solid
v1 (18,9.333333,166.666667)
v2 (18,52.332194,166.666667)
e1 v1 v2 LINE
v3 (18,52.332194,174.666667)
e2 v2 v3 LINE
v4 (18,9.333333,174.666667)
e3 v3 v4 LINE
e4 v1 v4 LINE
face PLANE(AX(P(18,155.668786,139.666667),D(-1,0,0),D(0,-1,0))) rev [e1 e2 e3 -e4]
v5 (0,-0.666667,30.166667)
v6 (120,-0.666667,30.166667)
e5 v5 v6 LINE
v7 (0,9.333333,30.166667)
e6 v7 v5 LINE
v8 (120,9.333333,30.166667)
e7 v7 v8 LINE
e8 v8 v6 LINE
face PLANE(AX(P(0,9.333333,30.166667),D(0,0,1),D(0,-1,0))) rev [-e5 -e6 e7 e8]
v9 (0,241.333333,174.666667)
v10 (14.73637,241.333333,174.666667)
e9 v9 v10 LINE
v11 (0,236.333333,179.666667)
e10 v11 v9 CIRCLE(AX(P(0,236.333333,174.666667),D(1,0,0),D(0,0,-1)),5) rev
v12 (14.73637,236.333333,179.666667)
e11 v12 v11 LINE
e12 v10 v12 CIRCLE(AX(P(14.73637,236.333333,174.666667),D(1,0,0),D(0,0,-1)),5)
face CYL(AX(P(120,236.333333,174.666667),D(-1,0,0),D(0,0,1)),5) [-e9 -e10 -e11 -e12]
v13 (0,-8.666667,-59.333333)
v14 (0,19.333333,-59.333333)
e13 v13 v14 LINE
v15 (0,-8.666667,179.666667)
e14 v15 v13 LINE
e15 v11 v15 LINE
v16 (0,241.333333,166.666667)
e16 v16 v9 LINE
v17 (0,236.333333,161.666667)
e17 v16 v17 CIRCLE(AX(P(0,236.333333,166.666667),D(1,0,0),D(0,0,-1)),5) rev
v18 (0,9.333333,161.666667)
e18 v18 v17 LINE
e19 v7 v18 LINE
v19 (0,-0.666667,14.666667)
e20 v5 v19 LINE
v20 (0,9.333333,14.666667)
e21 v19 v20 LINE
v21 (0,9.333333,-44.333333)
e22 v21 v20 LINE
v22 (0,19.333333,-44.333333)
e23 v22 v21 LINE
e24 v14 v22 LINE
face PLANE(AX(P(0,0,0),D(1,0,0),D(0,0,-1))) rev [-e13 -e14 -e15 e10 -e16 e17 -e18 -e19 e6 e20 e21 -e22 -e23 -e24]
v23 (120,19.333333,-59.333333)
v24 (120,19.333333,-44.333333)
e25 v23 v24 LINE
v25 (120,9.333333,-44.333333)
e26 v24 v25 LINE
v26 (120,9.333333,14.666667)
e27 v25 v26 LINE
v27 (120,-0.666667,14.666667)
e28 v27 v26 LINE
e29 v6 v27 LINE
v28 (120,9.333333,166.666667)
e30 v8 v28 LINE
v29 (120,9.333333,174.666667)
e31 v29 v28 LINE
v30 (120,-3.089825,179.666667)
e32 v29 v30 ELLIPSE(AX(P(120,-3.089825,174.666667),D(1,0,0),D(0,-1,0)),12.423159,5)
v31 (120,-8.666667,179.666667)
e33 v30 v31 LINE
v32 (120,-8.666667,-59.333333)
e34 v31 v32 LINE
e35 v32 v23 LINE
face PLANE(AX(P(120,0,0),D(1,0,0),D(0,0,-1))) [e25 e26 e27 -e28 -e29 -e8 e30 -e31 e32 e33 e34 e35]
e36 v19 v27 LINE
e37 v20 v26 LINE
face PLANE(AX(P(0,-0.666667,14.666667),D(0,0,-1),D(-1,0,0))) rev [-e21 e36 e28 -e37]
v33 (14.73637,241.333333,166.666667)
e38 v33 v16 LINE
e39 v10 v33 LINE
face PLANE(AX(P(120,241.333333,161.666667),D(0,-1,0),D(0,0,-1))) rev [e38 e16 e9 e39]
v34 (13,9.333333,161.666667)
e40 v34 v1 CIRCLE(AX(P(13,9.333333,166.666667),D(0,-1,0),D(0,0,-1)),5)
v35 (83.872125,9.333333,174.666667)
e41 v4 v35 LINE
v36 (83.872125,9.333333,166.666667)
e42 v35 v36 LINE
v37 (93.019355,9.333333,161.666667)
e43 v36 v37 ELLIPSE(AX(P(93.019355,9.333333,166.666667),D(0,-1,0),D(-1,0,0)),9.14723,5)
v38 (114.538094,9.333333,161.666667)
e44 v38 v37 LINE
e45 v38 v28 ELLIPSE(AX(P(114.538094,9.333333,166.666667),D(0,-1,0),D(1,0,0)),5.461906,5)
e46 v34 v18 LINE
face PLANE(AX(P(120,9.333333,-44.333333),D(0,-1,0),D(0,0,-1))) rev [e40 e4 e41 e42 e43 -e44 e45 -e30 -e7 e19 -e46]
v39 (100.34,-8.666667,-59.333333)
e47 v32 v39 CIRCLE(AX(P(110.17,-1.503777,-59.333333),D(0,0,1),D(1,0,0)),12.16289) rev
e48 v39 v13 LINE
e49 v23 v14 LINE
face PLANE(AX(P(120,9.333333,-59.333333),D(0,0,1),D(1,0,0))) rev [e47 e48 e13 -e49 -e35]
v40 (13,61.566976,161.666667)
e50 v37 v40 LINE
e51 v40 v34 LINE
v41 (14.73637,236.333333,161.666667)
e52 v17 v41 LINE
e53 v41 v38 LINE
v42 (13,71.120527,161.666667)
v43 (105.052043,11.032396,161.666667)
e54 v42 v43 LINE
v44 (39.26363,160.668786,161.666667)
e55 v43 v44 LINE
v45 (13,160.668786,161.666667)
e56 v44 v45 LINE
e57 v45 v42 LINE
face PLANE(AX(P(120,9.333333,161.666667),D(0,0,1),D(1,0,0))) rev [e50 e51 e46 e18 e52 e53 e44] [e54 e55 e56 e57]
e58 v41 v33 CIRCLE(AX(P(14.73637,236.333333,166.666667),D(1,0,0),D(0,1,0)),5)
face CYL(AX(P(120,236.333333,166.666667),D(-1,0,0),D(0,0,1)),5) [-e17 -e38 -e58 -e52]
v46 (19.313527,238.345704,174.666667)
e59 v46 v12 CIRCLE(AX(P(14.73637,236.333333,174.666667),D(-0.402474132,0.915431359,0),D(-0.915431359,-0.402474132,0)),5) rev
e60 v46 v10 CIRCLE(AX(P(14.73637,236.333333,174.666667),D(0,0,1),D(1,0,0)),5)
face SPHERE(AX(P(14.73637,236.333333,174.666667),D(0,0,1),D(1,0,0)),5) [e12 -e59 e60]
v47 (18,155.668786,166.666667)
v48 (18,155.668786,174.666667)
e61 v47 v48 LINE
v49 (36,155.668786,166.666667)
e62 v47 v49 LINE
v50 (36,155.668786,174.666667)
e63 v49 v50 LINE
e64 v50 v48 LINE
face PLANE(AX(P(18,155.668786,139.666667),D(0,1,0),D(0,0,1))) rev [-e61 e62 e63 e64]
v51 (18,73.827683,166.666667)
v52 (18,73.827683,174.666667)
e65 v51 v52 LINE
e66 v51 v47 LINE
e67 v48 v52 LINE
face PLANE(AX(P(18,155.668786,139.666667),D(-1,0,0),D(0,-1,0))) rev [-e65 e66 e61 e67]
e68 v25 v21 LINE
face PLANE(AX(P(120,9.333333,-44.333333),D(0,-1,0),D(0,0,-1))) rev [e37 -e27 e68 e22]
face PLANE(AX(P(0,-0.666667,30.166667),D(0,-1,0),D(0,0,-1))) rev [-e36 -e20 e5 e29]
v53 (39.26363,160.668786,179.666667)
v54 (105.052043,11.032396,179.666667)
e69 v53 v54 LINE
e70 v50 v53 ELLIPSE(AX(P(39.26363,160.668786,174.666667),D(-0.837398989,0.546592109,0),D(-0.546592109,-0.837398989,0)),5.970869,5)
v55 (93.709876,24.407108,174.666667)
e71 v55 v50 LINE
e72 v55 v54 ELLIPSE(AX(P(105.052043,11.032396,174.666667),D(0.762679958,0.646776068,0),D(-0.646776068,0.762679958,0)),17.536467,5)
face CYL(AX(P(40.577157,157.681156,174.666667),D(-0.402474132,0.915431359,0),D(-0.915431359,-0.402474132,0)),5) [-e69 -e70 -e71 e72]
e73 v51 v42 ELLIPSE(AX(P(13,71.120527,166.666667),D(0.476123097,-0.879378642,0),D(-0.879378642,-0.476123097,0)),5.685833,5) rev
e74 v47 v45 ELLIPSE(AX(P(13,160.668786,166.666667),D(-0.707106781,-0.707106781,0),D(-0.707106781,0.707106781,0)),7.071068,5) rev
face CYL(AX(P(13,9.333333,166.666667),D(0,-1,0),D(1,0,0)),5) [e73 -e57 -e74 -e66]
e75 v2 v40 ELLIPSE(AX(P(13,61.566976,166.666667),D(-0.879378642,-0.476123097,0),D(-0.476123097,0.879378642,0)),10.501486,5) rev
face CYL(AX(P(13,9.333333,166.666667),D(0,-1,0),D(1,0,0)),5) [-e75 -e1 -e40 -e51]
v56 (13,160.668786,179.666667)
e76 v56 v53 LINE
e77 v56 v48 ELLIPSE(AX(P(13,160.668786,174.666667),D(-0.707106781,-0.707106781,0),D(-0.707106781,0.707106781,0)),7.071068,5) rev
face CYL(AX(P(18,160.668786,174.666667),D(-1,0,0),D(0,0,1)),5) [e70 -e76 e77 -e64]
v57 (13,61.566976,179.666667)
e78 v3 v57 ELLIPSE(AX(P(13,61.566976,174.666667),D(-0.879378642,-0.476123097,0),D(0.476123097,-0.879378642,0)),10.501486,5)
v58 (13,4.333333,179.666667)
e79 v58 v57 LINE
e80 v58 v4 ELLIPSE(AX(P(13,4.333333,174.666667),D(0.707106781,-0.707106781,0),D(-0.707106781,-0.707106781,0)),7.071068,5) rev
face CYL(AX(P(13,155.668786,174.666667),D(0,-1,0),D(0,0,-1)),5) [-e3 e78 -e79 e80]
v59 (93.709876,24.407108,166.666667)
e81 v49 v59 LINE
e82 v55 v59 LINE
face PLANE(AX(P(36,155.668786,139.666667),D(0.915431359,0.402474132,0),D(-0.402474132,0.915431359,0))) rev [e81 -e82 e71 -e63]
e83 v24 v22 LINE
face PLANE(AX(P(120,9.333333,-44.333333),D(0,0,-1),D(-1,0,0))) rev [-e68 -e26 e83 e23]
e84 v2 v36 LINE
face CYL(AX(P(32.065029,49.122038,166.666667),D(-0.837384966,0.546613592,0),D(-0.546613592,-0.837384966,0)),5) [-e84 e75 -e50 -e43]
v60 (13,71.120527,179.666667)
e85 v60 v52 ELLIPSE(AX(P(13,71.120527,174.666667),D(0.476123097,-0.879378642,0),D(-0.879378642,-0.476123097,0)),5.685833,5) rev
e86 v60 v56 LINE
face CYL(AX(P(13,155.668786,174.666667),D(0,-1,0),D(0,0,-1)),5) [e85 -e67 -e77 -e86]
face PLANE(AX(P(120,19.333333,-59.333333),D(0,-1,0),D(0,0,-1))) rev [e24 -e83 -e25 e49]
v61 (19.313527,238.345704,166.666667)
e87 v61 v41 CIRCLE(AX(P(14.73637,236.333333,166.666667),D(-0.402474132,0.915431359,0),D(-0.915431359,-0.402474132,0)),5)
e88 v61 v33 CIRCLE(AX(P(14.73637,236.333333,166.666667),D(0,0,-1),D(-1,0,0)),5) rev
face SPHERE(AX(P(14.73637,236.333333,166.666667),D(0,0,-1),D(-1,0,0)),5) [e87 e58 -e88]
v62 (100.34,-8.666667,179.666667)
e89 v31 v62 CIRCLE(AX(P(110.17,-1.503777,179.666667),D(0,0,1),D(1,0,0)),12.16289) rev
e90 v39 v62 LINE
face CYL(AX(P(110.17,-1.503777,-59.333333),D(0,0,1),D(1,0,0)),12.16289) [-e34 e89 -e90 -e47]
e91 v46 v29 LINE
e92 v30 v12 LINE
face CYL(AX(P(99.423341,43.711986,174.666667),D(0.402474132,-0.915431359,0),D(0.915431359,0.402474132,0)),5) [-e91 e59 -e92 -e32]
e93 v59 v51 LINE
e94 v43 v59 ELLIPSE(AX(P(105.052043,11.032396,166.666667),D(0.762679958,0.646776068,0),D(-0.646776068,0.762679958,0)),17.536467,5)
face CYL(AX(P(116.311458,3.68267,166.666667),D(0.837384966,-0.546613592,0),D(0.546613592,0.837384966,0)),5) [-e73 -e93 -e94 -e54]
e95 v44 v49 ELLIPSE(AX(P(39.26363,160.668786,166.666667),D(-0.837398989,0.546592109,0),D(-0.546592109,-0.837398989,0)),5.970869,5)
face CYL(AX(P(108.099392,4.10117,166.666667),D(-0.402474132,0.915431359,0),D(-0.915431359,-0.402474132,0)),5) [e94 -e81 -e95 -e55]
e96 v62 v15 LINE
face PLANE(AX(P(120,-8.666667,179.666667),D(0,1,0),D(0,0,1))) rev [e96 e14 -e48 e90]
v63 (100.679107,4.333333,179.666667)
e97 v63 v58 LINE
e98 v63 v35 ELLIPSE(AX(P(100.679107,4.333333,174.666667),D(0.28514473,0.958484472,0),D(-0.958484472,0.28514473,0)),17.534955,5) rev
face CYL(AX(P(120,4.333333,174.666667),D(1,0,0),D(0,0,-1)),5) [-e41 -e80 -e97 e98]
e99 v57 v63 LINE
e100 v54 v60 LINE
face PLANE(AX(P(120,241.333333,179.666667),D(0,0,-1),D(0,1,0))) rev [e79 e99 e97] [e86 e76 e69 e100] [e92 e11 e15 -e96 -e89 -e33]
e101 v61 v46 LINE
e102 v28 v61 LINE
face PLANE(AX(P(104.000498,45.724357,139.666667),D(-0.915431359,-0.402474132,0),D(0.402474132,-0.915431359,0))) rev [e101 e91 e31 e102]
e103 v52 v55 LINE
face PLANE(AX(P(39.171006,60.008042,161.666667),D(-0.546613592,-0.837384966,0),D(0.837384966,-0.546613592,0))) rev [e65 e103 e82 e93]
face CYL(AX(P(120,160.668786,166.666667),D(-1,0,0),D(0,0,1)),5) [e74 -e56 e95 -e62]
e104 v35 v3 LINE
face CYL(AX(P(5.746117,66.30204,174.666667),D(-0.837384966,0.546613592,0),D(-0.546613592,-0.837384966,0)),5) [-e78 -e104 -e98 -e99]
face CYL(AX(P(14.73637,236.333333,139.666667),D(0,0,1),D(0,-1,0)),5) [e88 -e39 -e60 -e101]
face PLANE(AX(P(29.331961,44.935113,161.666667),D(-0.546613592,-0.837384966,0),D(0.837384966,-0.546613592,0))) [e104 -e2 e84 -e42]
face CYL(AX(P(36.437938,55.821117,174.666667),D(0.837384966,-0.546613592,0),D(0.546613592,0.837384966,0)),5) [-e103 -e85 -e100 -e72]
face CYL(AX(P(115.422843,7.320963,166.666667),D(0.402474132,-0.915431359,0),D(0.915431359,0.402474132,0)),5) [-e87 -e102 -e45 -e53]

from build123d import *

# Parameters (mm, degrees)
EXTRUDE_1_DEPTH     = 120
SKETCH_2_W          = 15.5
SKETCH_2_H          = 10
CUT_EXTRUDE_1_DEPTH = 324.916484435
CUT_EXTRUDE_2_DEPTH = 40
CUT_EXTRUDE_3_DEPTH = 40
FILLET_16_R         = 5
EXTRUDE_2_DEPTH     = 239
EXTRUDE_3_DEPTH     = 18
FILLET_17_R         = 5


with BuildPart() as part:
    # 草圖1 → 填料-伸長1 (new body)
    with BuildSketch(Plane(origin=(0, 0, 0), x_dir=(0, 0, -1), z_dir=(1, 0, 0))):
        Polygon((-179.666666667, 241.333333333), (-179.666666667, -8.666666667), (59.333333333, -8.666666667), (59.333333333, 9.333333333), (59.333333333, 19.333333333), (44.333333333, 19.333333333), (44.333333333, 9.333333333), (-161.666666667, 9.333333333), (-161.666666667, 241.333333333), align=None)
    extrude(amount=EXTRUDE_1_DEPTH)

    # 草圖2 → 除料-伸長1 (cut, through all)
    with BuildSketch(Plane(origin=(120, 0, 0), x_dir=(0, 0, -1), z_dir=(1, 0, 0))):
        with Locations((-22.416666667, 4.333333333)):
            Rectangle(SKETCH_2_W, SKETCH_2_H)
    extrude(amount=-CUT_EXTRUDE_1_DEPTH, mode=Mode.SUBTRACT)

    # 草圖4 → 除料-伸長2 (cut)
    with BuildSketch(Plane.XY.offset(179.666666667)):
        Polygon((120, 241.333333333), (18, 241.333333333), (120, 9.333333333), align=None)
    extrude(amount=-CUT_EXTRUDE_2_DEPTH, mode=Mode.SUBTRACT)

    # 草圖5 → 除料-伸長3 (cut)
    with BuildSketch(Plane.XY.offset(179.666666667)):
        Polygon((36, 155.668785671), (100.337138528, 9.333333333), (18, 9.333333333), (18, 155.668785671), align=None)
    extrude(amount=-CUT_EXTRUDE_3_DEPTH, mode=Mode.SUBTRACT)

    # 圓角16
    # the kernel refuses this fillet: 5 mm, written as the material it takes off along each edge
    with BuildSketch(Plane(origin=(14.736369898, 236.333333333, 166.666666667), x_dir=(0.9154313590233789, 0.40247413198441667, 0), z_dir=(0, 0, -1))) as fillet_16_piece_1_section:
        Polygon((0, 0), (FILLET_16_R, 0), (FILLET_16_R, -FILLET_16_R * 0.652726020499), (FILLET_16_R * 0.402474131984, -FILLET_16_R * 0.915431359023), align=None)
    fillet_16_piece_1 = extrude(amount=FILLET_16_R, mode=Mode.PRIVATE)
    fillet_16_piece_1 = fillet_16_piece_1 - Plane(origin=(14.736369898, 236.333333333, 166.666666667), x_dir=(-0.5465921093537591, -0.8373989885306815, 0), z_dir=(0, 0, -1)) * Sphere(FILLET_16_R, mode=Mode.PRIVATE)
    add(fillet_16_piece_1, mode=Mode.SUBTRACT)
    with BuildSketch(Plane(origin=(14.736369898, 236.333333333, 174.666666667), x_dir=(0, 1, 0), z_dir=(0, 0, 1))) as fillet_16_piece_2_section:
        Polygon((0, 0), (FILLET_16_R, 0), (FILLET_16_R, -FILLET_16_R * 0.652726020499), (FILLET_16_R * 0.402474131984, -FILLET_16_R * 0.915431359023), align=None)
    fillet_16_piece_2 = extrude(amount=FILLET_16_R, mode=Mode.PRIVATE)
    fillet_16_piece_2 = fillet_16_piece_2 - Plane(origin=(14.736369898, 236.333333333, 174.666666667), x_dir=(-0.5465921093537591, -0.8373989885306815, 0), z_dir=(0, 0, 1)) * Sphere(FILLET_16_R, mode=Mode.PRIVATE)
    add(fillet_16_piece_2, mode=Mode.SUBTRACT)
    with BuildSketch(Plane(origin=(-12.5, 241.333333333, 161.666666667), x_dir=(0, 0, 1), z_dir=(1, 0, 0)), Plane(origin=(-12.5, 241.333333333, 179.666666667), x_dir=(0, -1, 0), z_dir=(1, 0, 0))) as fillet_16_piece_3:
        with BuildLine():
            CenterArc((FILLET_16_R, FILLET_16_R), FILLET_16_R, 180, 90)
            Line((0, FILLET_16_R), (0, 0))
            Line((0, 0), (FILLET_16_R, 0))
        make_face()
    extrude(amount=27.236369898, mode=Mode.SUBTRACT)
    with BuildSketch(Plane(origin=(18, 241.333333333, 174.666666667), x_dir=(-1, 0, 0), z_dir=(0, 0, -1))) as fillet_16_piece_4:
        with BuildLine():
            CenterArc((FILLET_16_R * 0.652726020499, -FILLET_16_R), FILLET_16_R, 90, 66.267060196)
            Line((-FILLET_16_R * 0.262705338524, -FILLET_16_R * 0.597525868016), (0, 0))
            Line((0, 0), (FILLET_16_R * 0.652726020499, 0))
        make_face()
    extrude(amount=8, mode=Mode.SUBTRACT)
    with BuildSketch(Plane(origin=(19.313526693, 238.345703993, 161.666666667), x_dir=(0, 0, 1), z_dir=(0.40247413198441667, -0.9154313590233789, 0))) as fillet_16_piece_5_section:
        with BuildLine():
            CenterArc((FILLET_16_R, FILLET_16_R), FILLET_16_R, 180, 90)
            Line((0, FILLET_16_R), (0, 0))
            Line((0, 0), (FILLET_16_R, 0))
        make_face()
    fillet_16_piece_5 = extrude(amount=262.668806653, mode=Mode.PRIVATE)
    fillet_16_piece_5 = split(fillet_16_piece_5, bisect_by=Plane(origin=(68.522420019, 9.333333333, 162.799850977), z_dir=(0, 1, 0)), keep=Keep.TOP, mode=Mode.PRIVATE)
    add(fillet_16_piece_5, mode=Mode.SUBTRACT)
    with BuildSketch(Plane(origin=(19.313526693, 238.345703993, 179.666666667), x_dir=(-0.9154313590233789, -0.40247413198441667, 5.6843418860808026e-15), z_dir=(0.40247413198441667, -0.9154313590233789, 0))) as fillet_16_piece_6:
        with BuildLine():
            CenterArc((FILLET_16_R, FILLET_16_R), FILLET_16_R, 180, 90)
            Line((0, FILLET_16_R), (0, 0))
            Line((0, 0), (FILLET_16_R, 0))
        make_face()
    extrude(amount=262.668806653, mode=Mode.SUBTRACT)

    # 草圖8 → 填料-伸長2 (add)
    with BuildSketch(Plane.XY.offset(179.666666667)):
        with BuildLine():
            ThreePointArc((110.17, -13.666666712), (115.684274668, -12.344840676), (120, -8.666666667))
            Line((120, -8.666666667), (110.17, -8.666666667))
            Line((110.17, -8.666666667), (110.17, -13.666666667))
        make_face()
        with BuildLine():
            Line((110.17, -13.666666667), (110.17, -8.666666667))
            Line((110.17, -8.666666667), (100.34, -8.666666667))
            ThreePointArc((100.34, -8.666666667), (104.655725332, -12.344840676), (110.17, -13.666666712))
        make_face()
        with BuildLine():
            ThreePointArc((110.17, -13.666666712), (115.684274668, -12.344840676), (120, -8.666666667))
            Line((120, -8.666666667), (110.17, -8.666666667))
            Line((110.17, -8.666666667), (110.17, -13.666666667))
        make_face()
        with BuildLine():
            Line((110.17, -13.666666667), (110.17, -8.666666667))
            Line((110.17, -8.666666667), (100.34, -8.666666667))
            ThreePointArc((100.34, -8.666666667), (104.655725332, -12.344840676), (110.17, -13.666666712))
        make_face()
    extrude(amount=-EXTRUDE_2_DEPTH)

    # 草圖9 → 填料-伸長3 (add)
    with BuildSketch(Plane.XY.offset(179.666666667)):
        Polygon((18, 63.079938443), (100.337138528, 9.333333333), (93.709875708, 24.407107589), (22.919522331, 70.616403134), (18, 73.827683351), align=None)
        Polygon((18, 52.332193536), (83.872125352, 9.333333333), (100.337138528, 9.333333333), (18, 63.079938443), align=None)
        Polygon((100.337138528, 9.333333333), (83.872125352, 9.333333333), (95.417616197, 1.796868643), align=None)
        Polygon((93.711170014, 24.406262715), (100.337138528, 9.333333333), (105.256660859, 16.869798024), align=None)
        Polygon((10.463535309, 67.999460774), (18, 63.079938443), (18, 73.827683351), (15.38305764, 75.535925465), align=None)
        Polygon((13.080477669, 55.543473753), (18, 52.332193536), (18, 63.079938443), align=None)
    extrude(amount=-EXTRUDE_3_DEPTH)

    # 圓角17
    fillet_17_edges = [part.edges().sort_by_distance(p)[0] for p in [
        (18, 30.832763435, 179.666666667),
        (18, 30.832763435, 161.666666667),
        (64.854937854, 90.03794663, 179.666666667),
        (64.854937854, 90.03794663, 161.666666667),
        (50.936062676, 30.832763435, 179.666666667),
        (55.854937854, 49.11739547, 179.666666667),
        (55.854937854, 49.11739547, 161.666666667),
        (50.936062676, 30.832763435, 161.666666667),
        (18, 114.748234511, 161.666666667),
        (27, 155.668785671, 161.666666667),
        (27, 155.668785671, 179.666666667),
        (18, 114.748234511, 179.666666667),
        (50.936062676, 9.333333333, 179.666666667),
    ]]
    fillet(fillet_17_edges, radius=FILLET_17_R)


solid = part.part
